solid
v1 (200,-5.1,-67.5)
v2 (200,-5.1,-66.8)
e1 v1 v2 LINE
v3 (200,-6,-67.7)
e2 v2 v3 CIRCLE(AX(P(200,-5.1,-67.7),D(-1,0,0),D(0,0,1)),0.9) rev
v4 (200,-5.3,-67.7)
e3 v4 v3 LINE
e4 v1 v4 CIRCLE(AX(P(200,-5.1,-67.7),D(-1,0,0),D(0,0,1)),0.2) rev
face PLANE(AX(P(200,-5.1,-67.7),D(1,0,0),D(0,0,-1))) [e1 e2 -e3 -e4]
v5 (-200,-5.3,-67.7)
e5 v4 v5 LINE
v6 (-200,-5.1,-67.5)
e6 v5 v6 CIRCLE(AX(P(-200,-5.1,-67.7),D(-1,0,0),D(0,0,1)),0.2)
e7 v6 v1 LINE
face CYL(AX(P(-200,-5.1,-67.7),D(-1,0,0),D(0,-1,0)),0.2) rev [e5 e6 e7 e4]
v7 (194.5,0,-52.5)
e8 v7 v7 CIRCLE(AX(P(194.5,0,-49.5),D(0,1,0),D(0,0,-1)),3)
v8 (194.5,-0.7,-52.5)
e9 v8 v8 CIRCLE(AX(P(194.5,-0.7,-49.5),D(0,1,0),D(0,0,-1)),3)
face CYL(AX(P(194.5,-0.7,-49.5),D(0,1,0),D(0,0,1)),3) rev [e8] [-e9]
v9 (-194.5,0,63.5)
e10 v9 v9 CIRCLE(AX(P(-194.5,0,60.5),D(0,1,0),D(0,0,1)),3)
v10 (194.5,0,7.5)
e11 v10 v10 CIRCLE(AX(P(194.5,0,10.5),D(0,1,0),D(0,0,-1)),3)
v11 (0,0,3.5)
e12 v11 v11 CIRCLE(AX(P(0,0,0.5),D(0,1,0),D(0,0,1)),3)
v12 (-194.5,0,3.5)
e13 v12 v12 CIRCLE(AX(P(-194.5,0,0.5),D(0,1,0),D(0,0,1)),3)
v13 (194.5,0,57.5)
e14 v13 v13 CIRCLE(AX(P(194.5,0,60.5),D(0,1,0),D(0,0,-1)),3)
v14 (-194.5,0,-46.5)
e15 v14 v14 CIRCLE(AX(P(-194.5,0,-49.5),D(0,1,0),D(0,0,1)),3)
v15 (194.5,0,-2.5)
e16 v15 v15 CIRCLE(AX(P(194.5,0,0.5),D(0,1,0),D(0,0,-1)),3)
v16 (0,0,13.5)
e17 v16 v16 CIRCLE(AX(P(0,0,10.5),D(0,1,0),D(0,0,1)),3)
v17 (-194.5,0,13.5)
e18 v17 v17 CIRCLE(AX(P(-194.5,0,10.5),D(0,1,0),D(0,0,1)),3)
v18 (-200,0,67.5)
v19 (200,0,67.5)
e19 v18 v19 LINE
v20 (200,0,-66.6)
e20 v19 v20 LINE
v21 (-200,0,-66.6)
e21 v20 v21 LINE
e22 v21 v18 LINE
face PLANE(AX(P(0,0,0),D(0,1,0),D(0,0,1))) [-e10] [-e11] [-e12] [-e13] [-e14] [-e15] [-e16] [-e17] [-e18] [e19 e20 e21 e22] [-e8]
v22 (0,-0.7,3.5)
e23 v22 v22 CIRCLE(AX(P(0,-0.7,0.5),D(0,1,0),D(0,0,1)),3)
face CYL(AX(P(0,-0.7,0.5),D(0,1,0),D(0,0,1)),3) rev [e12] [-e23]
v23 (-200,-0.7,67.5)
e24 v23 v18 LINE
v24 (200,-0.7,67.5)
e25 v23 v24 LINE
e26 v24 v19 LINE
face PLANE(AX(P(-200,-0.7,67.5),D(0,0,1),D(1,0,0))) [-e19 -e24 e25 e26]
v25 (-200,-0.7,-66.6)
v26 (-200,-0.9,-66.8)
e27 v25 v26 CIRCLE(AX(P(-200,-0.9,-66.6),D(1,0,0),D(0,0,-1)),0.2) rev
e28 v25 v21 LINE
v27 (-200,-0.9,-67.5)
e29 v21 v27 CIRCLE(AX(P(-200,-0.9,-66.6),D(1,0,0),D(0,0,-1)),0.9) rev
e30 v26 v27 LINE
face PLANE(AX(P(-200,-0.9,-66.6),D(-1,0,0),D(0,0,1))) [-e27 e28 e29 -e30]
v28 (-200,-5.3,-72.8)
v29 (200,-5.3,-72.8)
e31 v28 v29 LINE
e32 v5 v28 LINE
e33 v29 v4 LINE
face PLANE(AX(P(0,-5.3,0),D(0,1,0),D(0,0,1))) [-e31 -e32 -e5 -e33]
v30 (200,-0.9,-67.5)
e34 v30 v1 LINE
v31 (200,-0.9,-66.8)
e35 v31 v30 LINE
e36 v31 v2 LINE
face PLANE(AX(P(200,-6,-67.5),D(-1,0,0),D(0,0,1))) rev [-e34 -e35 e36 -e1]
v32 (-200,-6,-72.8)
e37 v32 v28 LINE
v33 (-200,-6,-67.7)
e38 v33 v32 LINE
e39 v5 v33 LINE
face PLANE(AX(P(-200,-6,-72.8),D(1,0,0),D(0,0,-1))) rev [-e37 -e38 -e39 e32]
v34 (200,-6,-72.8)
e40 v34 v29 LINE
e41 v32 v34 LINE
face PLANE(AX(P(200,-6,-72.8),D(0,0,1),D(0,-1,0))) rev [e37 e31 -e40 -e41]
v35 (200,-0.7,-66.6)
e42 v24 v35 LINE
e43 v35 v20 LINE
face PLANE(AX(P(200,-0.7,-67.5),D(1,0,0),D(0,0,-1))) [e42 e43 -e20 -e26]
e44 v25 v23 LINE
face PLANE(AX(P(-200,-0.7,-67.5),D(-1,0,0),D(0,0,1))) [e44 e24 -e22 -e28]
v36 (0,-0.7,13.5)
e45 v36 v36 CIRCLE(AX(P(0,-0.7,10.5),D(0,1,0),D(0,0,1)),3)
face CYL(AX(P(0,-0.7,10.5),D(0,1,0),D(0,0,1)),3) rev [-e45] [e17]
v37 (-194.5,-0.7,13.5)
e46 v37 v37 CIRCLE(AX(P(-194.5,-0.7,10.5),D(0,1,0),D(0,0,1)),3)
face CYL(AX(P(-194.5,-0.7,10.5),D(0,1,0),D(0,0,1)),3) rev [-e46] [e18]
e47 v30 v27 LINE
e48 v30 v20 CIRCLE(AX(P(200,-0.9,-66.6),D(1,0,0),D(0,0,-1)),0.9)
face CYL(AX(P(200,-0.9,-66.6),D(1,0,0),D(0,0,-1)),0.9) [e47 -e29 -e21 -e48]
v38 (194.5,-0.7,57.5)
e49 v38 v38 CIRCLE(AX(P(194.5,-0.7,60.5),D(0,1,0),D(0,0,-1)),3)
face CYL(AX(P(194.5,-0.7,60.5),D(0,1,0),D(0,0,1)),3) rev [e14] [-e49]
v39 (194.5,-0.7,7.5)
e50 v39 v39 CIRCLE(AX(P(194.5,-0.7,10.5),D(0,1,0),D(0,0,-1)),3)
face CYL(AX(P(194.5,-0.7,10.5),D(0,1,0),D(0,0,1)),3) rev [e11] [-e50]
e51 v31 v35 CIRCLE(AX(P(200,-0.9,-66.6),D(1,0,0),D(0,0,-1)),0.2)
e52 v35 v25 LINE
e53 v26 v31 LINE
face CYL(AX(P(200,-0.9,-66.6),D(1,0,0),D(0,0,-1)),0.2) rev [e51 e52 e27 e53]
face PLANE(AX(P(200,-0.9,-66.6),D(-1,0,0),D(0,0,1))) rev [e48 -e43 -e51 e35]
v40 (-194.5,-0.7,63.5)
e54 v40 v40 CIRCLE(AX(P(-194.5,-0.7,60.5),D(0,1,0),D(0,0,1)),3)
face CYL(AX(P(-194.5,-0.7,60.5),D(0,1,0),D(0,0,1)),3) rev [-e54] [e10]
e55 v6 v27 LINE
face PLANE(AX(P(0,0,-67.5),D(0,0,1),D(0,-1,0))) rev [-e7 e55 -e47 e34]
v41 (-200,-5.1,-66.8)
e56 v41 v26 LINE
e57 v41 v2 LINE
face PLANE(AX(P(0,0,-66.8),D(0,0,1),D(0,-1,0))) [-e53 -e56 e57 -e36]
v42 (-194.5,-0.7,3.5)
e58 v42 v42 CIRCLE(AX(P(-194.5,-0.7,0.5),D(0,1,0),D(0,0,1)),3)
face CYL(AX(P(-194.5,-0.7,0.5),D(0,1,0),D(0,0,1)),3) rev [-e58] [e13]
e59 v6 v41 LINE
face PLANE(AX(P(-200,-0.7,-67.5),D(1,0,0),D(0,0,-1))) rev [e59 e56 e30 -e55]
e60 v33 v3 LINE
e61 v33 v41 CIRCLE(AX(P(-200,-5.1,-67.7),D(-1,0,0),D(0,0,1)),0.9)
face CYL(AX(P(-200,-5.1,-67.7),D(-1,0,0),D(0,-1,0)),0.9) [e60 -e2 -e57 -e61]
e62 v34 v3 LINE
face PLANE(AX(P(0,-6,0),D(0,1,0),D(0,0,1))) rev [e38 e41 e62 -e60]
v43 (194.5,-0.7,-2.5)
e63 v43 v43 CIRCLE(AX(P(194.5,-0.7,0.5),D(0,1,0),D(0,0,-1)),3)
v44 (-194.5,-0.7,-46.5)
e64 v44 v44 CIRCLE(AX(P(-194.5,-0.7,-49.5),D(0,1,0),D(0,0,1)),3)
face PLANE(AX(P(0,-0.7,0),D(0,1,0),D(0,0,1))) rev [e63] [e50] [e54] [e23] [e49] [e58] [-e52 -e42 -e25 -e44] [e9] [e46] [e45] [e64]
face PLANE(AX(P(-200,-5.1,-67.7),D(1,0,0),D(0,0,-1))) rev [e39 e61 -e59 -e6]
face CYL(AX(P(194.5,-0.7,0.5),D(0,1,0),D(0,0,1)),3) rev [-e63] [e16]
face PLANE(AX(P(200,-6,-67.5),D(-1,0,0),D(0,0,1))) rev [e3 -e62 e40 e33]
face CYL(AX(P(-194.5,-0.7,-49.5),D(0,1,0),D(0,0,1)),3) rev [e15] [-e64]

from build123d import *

# Parameters (mm, degrees)
SKETCH_1_W                       = 400
SKETCH_1_H                       = 135
SKETCH_1_R                       = 3
SM_BASE_FLANGE_1_DEPTH           = 0.7
SM_EDGE_FLANGE_1_STRIP_W         = 3.2
SM_EDGE_FLANGE_1_STRIP_H         = 0.7
SM_EDGE_FLANGE_1_STRIP_CUT_DEPTH = 400
SM_EDGE_FLANGE_1_DEPTH           = 400
SM_EDGE_FLANGE_2_STRIP_W         = 3.2
SM_EDGE_FLANGE_2_STRIP_H         = 0.7
SM_EDGE_FLANGE_2_STRIP_CUT_DEPTH = 400
SM_EDGE_FLANGE_2_DEPTH           = 400


# Sheet-metal steps are written as plain solids
with BuildPart() as part:
    # Sketch 1 → 基体-法兰1 (new body)
    with BuildSketch(Plane(origin=(0, 0, 0), x_dir=(1, 0, 0), z_dir=(0, 1, 0))):
        Rectangle(SKETCH_1_W, SKETCH_1_H)
        with Locations(Location((-194.5, -60.5, 0), (0, 0, 270))):
            Circle(SKETCH_1_R, mode=Mode.SUBTRACT)
        with Locations(Location((-194.5, -10.5, 0), (0, 0, 270))):
            Circle(SKETCH_1_R, mode=Mode.SUBTRACT)
        with Locations(Location((-194.5, -0.5, 0), (0, 0, 270))):
            Circle(SKETCH_1_R, mode=Mode.SUBTRACT)
        with Locations(Location((-194.5, 49.5, 0), (0, 0, 270))):
            Circle(SKETCH_1_R, mode=Mode.SUBTRACT)
        with Locations(Location((0, -10.5, 0), (0, 0, 270))):
            Circle(SKETCH_1_R, mode=Mode.SUBTRACT)
        with Locations(Location((0, -0.5, 0), (0, 0, 270))):
            Circle(SKETCH_1_R, mode=Mode.SUBTRACT)
        with Locations(Location((194.5, -60.5, 0), (0, 0, 90))):
            Circle(SKETCH_1_R, mode=Mode.SUBTRACT)
        with Locations(Location((194.5, -10.5, 0), (0, 0, 90))):
            Circle(SKETCH_1_R, mode=Mode.SUBTRACT)
        with Locations(Location((194.5, -0.5, 0), (0, 0, 90))):
            Circle(SKETCH_1_R, mode=Mode.SUBTRACT)
        with Locations(Location((194.5, 49.5, 0), (0, 0, 90))):
            Circle(SKETCH_1_R, mode=Mode.SUBTRACT)
    extrude(amount=-SM_BASE_FLANGE_1_DEPTH)

    # 边线-法兰1 strip (across the edge) → 边线-法兰1 strip cut (cut)
    with BuildSketch(Plane(origin=(-200, -0.7, -67.5), x_dir=(0, 0, 1), z_dir=(1, 0, 0))):
        with Locations((-0.7, -0.35)):
            Rectangle(SM_EDGE_FLANGE_1_STRIP_W, SM_EDGE_FLANGE_1_STRIP_H)
    extrude(amount=SM_EDGE_FLANGE_1_STRIP_CUT_DEPTH, mode=Mode.SUBTRACT)

    # 边线-法兰1 section (across the edge) → 边线-法兰1 (add)
    with BuildSketch(Plane(origin=(-200, -0.7, -67.5), x_dir=(0, 0, 1), z_dir=(1, 0, 0))):
        with BuildLine():
            Line((0, 0.2), (0, 5.3))
            Line((0, 5.3), (0.7, 5.3))
            Line((0.7, 5.3), (0.7, 0.2))
            ThreePointArc((0.7, 0.2), (0.758578644, 0.058578644), (0.9, 0))
            Line((0.9, 0), (0.9, -0.7))
            ThreePointArc((0.9, -0.7), (0.263603897, -0.436396103), (0, 0.2))
        make_face()
    extrude(amount=SM_EDGE_FLANGE_1_DEPTH)

    # 边线-法兰2 strip (across the edge) → 边线-法兰2 strip cut (cut)
    with BuildSketch(Plane(origin=(200, -6, -67.5), x_dir=(0, 1, 0), z_dir=(-1, 0, 0))):
        with Locations((-0.7, -0.35)):
            Rectangle(SM_EDGE_FLANGE_2_STRIP_W, SM_EDGE_FLANGE_2_STRIP_H)
    extrude(amount=SM_EDGE_FLANGE_2_STRIP_CUT_DEPTH, mode=Mode.SUBTRACT)

    # 边线-法兰2 section (across the edge) → 边线-法兰2 (add)
    with BuildSketch(Plane(origin=(200, -6, -67.5), x_dir=(0, 1, 0), z_dir=(-1, 0, 0))):
        with BuildLine():
            Line((0, 0.2), (0, 5.3))
            Line((0, 5.3), (0.7, 5.3))
            Line((0.7, 5.3), (0.7, 0.2))
            ThreePointArc((0.7, 0.2), (0.758578644, 0.058578644), (0.9, 0))
            Line((0.9, 0), (0.9, -0.7))
            ThreePointArc((0.9, -0.7), (0.263603897, -0.436396103), (0, 0.2))
        make_face()
    extrude(amount=SM_EDGE_FLANGE_2_DEPTH)


solid = part.part
